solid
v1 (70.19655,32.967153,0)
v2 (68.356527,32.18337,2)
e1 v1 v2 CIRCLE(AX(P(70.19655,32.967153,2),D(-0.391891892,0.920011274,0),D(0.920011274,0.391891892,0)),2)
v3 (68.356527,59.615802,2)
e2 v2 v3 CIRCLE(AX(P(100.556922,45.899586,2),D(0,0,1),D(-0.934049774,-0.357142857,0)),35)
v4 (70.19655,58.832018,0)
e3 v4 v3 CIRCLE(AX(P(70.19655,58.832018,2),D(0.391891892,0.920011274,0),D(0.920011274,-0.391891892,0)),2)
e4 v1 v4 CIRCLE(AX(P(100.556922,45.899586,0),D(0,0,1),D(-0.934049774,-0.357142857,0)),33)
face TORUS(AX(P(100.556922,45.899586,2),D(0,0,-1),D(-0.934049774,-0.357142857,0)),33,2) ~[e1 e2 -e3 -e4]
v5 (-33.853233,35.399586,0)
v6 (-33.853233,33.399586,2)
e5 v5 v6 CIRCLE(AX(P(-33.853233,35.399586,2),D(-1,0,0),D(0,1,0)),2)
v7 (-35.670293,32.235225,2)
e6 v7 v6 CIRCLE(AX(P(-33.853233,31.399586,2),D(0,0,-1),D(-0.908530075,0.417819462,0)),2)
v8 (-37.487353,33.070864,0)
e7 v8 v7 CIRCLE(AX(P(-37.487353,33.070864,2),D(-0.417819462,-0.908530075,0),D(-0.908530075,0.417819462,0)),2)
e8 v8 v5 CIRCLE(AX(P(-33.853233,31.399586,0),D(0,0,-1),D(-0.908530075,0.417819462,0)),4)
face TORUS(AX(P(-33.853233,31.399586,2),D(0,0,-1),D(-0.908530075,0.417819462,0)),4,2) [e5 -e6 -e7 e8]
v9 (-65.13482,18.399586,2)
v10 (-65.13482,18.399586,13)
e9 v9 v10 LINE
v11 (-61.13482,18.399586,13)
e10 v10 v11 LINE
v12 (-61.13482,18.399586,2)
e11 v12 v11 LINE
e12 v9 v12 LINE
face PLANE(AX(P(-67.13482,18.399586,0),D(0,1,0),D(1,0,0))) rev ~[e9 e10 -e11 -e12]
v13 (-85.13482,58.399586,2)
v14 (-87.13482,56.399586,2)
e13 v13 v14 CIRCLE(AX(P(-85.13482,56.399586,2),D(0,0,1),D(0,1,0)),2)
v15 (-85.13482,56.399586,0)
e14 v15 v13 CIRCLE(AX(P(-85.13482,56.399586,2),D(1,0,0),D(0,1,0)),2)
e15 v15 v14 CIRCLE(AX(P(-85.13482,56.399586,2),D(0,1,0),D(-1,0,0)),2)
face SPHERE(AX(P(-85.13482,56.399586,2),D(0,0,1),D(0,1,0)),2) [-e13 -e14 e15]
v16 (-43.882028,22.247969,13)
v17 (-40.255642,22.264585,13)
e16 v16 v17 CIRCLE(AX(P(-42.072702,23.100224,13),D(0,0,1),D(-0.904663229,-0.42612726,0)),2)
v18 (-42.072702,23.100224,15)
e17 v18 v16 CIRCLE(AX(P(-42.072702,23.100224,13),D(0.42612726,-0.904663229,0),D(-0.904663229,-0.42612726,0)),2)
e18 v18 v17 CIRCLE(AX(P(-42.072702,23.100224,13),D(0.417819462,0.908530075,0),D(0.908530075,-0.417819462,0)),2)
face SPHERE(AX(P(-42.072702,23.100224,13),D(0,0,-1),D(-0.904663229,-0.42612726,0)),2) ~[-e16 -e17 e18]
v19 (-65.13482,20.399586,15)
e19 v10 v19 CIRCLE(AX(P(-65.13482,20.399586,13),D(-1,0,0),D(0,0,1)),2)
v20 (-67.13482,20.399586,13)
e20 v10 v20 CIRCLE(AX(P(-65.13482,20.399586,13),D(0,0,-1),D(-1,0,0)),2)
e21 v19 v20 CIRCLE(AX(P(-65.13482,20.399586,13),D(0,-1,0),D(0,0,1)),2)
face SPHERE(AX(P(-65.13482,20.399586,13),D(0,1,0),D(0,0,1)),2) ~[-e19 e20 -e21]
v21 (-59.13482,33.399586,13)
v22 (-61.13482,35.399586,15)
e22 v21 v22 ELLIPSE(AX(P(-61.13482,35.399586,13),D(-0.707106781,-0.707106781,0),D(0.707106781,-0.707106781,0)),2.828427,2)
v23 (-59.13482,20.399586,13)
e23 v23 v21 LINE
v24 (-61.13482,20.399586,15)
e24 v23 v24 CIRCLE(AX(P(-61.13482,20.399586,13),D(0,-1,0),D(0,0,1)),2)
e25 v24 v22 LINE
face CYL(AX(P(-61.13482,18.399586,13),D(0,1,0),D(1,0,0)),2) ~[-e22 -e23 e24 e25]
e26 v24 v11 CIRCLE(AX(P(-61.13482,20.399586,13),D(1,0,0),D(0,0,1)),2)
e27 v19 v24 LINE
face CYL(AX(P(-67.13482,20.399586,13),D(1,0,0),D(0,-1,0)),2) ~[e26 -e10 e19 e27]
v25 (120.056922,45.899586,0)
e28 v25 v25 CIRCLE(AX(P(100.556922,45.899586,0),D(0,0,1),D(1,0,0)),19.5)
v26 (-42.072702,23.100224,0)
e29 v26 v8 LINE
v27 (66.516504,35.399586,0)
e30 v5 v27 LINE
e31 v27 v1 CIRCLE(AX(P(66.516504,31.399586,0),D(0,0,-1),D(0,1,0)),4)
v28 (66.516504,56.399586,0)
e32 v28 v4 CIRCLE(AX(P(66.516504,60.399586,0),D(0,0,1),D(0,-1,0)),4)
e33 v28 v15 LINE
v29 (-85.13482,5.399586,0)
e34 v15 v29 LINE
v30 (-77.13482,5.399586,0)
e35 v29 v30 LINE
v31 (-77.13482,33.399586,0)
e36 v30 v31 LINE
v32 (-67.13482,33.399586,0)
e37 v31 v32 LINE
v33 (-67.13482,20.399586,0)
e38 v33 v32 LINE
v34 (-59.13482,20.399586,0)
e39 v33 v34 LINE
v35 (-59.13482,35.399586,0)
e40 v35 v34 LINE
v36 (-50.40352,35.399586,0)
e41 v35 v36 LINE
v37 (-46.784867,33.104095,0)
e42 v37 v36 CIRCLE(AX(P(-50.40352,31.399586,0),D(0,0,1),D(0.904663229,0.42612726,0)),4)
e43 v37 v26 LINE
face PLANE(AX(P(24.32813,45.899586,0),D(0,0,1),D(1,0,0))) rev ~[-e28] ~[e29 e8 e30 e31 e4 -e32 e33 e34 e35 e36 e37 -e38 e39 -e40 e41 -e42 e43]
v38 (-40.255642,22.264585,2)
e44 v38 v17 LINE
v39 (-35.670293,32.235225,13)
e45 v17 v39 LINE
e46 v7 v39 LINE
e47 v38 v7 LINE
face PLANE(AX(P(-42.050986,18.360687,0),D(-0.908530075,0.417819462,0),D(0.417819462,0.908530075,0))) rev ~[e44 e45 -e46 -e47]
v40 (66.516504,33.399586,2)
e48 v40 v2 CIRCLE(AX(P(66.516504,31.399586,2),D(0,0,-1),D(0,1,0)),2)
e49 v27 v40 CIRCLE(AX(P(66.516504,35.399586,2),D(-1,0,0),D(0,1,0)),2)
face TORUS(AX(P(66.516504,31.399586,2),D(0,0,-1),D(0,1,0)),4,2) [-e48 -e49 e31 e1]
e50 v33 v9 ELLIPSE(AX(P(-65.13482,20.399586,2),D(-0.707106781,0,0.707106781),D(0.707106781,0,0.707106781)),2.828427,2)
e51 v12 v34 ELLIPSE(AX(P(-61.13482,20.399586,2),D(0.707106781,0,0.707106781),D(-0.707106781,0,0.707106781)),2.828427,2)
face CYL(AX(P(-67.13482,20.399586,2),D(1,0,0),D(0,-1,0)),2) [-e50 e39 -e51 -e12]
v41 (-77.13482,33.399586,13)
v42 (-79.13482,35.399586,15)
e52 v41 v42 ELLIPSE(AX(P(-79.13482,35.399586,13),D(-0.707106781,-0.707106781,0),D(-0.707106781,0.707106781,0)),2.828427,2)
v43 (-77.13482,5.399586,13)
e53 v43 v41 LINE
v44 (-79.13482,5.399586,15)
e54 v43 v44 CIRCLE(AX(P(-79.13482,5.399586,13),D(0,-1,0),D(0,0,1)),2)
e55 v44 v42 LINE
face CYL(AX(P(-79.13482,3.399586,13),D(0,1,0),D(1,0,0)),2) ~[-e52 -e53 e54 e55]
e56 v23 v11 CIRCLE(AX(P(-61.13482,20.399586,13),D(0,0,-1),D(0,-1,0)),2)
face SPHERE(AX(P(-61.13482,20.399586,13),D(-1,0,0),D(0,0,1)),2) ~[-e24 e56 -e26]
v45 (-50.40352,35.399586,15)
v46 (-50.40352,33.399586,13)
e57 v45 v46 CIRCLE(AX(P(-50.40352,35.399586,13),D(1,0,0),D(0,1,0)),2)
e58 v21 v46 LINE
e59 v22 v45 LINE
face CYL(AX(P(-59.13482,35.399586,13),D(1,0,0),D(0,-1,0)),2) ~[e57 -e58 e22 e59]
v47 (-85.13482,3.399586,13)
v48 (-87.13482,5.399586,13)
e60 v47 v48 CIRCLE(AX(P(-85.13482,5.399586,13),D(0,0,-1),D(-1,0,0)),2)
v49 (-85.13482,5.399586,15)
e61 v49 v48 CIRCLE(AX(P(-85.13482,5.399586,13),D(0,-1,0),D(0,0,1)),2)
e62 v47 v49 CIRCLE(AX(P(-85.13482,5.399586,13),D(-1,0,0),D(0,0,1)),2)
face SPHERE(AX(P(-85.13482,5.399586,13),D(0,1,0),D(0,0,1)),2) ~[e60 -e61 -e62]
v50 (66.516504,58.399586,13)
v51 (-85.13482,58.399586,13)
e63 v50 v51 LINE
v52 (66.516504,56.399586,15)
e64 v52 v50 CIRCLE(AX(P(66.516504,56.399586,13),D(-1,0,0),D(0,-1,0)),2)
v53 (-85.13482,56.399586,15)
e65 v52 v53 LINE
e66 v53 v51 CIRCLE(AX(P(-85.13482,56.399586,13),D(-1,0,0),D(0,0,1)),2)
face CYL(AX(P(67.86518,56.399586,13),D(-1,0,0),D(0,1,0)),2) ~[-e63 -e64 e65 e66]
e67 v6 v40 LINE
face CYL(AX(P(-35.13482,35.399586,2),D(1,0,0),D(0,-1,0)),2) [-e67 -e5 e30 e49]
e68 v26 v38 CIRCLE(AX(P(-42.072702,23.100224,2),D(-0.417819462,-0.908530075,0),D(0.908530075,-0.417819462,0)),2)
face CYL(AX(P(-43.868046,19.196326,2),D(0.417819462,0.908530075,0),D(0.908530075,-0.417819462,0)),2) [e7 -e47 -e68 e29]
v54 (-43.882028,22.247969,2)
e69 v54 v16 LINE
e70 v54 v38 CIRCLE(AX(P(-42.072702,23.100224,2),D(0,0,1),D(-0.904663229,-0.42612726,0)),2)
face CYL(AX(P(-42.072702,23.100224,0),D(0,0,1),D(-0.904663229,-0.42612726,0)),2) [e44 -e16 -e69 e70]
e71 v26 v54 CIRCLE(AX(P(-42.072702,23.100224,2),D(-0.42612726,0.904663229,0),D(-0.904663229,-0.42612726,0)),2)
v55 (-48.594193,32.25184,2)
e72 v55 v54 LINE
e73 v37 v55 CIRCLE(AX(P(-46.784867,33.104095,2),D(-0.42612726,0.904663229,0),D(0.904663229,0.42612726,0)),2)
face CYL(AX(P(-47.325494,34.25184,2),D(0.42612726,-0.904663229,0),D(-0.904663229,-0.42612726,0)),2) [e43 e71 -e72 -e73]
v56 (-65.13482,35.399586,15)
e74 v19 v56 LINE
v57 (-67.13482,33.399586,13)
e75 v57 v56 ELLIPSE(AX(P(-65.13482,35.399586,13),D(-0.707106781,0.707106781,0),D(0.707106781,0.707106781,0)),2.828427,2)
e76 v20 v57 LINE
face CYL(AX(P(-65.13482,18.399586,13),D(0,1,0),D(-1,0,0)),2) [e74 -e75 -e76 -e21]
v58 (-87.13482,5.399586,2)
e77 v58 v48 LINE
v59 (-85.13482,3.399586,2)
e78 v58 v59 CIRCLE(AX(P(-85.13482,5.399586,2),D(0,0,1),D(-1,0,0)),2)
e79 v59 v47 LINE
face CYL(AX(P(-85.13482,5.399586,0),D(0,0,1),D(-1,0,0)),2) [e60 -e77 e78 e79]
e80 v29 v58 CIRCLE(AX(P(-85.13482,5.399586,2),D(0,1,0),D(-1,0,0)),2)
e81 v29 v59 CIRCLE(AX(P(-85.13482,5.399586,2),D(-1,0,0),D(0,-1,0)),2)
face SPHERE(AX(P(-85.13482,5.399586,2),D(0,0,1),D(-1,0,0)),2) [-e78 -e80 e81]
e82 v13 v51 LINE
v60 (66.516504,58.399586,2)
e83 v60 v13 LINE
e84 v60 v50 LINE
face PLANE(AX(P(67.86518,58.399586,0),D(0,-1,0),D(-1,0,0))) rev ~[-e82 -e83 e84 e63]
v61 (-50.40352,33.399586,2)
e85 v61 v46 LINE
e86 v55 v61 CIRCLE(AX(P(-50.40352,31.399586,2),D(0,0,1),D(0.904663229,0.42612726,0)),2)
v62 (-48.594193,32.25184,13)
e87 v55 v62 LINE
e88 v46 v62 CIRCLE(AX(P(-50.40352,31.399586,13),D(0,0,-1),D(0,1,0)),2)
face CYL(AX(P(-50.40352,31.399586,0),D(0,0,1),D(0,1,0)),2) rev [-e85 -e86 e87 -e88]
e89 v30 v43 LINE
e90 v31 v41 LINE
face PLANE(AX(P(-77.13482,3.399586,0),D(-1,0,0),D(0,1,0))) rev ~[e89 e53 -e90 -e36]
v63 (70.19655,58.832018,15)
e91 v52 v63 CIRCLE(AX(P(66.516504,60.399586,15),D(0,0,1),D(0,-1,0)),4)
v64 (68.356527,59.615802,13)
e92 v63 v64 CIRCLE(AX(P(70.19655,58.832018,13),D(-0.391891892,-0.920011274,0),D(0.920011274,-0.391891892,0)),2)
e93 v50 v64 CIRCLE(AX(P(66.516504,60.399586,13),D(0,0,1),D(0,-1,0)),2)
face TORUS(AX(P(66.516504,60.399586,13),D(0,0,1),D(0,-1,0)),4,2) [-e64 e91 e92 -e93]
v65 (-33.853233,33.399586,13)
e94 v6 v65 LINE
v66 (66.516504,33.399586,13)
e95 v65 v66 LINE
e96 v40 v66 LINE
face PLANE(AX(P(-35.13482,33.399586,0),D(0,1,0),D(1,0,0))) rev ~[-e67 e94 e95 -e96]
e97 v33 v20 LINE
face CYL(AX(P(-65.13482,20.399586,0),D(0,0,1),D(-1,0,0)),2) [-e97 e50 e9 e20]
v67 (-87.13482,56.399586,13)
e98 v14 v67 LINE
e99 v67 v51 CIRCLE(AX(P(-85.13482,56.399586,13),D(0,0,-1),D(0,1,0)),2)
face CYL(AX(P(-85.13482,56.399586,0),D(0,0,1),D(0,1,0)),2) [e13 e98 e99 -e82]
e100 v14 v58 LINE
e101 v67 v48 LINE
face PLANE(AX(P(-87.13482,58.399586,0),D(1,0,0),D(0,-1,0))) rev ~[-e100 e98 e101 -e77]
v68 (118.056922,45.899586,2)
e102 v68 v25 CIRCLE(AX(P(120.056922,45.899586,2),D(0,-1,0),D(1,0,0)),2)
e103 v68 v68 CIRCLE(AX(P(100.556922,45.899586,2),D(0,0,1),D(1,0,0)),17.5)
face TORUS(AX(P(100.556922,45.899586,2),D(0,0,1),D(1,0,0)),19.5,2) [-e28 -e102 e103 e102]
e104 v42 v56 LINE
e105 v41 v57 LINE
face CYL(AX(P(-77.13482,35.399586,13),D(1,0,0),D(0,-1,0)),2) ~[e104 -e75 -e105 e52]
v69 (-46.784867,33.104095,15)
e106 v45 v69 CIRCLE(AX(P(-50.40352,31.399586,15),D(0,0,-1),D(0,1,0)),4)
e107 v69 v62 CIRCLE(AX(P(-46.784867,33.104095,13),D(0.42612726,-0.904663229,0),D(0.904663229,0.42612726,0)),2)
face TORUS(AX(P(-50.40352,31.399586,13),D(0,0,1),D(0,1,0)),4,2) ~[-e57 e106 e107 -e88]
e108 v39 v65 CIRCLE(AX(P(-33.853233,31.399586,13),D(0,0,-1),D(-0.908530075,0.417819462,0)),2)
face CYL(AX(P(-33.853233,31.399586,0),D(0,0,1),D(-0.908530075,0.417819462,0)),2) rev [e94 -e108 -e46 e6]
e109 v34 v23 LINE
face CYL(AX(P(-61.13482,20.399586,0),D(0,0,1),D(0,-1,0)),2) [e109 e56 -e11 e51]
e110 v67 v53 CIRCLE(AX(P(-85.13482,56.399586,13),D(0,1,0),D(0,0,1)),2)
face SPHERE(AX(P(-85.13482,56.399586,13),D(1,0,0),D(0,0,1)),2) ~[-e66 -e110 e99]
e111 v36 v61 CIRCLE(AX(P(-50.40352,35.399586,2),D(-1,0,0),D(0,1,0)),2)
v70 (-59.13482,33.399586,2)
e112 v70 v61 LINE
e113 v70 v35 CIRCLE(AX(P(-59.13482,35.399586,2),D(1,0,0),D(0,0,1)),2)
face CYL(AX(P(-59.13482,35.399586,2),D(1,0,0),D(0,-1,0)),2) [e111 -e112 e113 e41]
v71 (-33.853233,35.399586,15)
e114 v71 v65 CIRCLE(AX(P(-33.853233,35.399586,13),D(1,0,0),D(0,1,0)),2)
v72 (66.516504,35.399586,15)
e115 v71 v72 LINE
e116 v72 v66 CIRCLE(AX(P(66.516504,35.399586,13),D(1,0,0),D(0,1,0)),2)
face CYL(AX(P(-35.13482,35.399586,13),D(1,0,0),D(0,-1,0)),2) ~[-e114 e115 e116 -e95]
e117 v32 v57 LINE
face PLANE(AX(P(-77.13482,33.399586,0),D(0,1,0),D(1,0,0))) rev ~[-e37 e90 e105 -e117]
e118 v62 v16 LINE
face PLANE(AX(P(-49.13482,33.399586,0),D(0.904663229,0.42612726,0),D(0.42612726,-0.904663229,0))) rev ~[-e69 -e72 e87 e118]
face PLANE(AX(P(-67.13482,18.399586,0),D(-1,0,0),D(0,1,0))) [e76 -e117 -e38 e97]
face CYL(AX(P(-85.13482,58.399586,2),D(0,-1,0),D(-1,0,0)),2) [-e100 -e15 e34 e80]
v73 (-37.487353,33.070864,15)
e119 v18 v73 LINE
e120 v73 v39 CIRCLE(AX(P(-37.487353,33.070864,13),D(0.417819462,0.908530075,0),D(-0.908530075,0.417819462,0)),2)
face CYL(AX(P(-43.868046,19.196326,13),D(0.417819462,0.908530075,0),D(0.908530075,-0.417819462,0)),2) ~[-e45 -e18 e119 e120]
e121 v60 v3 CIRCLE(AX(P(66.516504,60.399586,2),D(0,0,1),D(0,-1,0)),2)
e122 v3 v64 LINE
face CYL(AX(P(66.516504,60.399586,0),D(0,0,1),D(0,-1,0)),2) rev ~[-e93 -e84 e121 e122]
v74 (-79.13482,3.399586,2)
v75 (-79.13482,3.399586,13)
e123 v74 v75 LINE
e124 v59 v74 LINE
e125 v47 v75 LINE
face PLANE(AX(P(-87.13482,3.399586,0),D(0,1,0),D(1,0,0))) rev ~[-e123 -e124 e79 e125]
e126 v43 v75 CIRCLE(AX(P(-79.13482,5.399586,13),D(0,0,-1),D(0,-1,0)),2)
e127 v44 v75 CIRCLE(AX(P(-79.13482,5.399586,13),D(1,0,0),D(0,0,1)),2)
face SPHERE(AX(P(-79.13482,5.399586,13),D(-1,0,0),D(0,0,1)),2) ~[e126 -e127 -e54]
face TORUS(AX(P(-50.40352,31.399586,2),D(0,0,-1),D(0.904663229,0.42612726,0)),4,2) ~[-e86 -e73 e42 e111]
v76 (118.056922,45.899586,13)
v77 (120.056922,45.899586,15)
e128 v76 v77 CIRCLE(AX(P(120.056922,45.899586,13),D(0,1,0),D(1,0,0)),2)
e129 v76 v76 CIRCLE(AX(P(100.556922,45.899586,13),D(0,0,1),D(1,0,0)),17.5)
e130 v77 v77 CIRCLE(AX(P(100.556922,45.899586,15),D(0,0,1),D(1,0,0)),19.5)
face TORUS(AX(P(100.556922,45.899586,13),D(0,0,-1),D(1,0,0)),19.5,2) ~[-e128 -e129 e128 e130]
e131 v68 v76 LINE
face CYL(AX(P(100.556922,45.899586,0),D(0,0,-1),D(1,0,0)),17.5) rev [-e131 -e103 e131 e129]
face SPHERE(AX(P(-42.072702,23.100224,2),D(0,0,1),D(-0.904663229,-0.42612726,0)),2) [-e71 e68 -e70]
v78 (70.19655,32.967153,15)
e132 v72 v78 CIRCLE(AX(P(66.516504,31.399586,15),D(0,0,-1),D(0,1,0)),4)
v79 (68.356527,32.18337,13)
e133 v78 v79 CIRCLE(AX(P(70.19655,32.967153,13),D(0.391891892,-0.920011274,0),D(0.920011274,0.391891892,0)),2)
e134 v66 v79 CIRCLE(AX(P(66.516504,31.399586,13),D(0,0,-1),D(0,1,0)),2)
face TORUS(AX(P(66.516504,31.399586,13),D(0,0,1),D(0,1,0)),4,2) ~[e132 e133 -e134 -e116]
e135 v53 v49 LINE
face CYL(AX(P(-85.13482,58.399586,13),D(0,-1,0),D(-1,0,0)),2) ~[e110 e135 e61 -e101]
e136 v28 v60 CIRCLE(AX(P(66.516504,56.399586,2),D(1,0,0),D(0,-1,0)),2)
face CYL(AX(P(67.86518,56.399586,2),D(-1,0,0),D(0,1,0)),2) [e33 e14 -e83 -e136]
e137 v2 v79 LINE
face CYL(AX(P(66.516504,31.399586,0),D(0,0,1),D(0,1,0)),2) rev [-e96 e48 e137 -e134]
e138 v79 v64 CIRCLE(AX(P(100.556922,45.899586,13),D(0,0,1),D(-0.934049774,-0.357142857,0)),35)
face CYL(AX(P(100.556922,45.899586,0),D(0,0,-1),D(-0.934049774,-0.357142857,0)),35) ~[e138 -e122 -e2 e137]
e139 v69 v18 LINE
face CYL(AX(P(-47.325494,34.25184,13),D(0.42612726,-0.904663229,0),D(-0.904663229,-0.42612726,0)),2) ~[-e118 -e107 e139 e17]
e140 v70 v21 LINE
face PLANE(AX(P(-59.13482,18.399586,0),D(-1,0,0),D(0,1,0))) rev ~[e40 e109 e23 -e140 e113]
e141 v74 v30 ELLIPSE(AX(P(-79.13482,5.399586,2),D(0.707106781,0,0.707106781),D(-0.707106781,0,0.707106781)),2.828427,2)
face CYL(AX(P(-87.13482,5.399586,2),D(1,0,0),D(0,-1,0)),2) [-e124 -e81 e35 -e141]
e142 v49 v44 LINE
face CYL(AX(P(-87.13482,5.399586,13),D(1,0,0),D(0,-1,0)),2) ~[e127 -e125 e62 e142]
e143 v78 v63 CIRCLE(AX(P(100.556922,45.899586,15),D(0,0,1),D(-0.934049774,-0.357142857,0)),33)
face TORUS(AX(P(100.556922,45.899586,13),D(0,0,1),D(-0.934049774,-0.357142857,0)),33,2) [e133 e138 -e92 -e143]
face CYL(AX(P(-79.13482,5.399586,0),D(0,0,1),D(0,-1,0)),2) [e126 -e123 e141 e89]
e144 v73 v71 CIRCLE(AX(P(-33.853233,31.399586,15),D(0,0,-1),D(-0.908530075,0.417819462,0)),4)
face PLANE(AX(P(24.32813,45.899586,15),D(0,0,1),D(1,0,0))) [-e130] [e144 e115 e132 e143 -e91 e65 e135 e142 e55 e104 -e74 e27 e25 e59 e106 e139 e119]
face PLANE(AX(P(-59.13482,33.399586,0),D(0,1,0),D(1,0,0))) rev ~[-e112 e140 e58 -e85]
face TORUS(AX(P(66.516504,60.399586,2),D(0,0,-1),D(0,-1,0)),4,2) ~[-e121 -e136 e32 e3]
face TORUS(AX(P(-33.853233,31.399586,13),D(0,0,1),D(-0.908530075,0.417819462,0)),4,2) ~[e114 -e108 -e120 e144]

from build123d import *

# Parameters (mm, degrees)
F0_R     = 17.5
F0_W     = 8
F0_H     = 15
F0_W_2   = 10
F0_H_2   = 30
F1_DEPTH = 15
F2_R     = 2


with BuildPart() as f1:
    # F0 (on Top) → F1 (new body)
    with BuildSketch(Plane.XY):
        with BuildLine():
            Line((67.8651795072, 58.3995857492), (-87.1348204928, 58.3995857492))
            Line((-87.1348204928, 58.3995857492), (-87.1348204928, 33.3995857492))
            Line((-87.1348204928, 33.3995857492), (-77.1348204928, 33.3995857492))
            Line((-77.1348204928, 33.3995857492), (-67.1348204928, 33.3995857492))
            Line((-67.1348204928, 33.3995857492), (-59.1348204928, 33.3995857492))
            Line((-59.1348204928, 33.3995857492), (-49.1348204928, 33.3995857492))
            Line((-49.1348204928, 33.3995857492), (-35.1348204928, 33.3995857492))
            Line((-35.1348204928, 33.3995857492), (67.8651795072, 33.3995857492))
            ThreePointArc((67.8651795072, 33.3995857492), (135.5569215837, 45.8995857492), (67.8651795072, 58.3995857492))
        make_face()
        with Locations((100.5569215837, 45.8995857492)):
            Circle(F0_R, mode=Mode.SUBTRACT)
        with Locations((-63.1348204928, 25.8995857492)):
            Rectangle(F0_W, F0_H)
        Polygon((-42.0509860516, 18.3606874198), (-35.1348204928, 33.3995857492), (-49.1348204928, 33.3995857492), align=None)
        with Locations((-82.1348204928, 18.3995857492)):
            Rectangle(F0_W_2, F0_H_2)
    extrude(amount=F1_DEPTH)

    # F2
    f2_edges = [f1.edges().sort_by_distance(p)[0] for p in [
        (-54.13482, 33.399586, 15),
        (-9.63482, 58.399586, 15),
        (-87.13482, 30.899586, 15),
        (-82.13482, 3.399586, 15),
        (-77.13482, 18.399586, 15),
        (-72.13482, 33.399586, 15),
        (-67.13482, 25.899586, 15),
        (-63.13482, 18.399586, 15),
        (-59.13482, 25.899586, 15),
        (-45.592903, 25.880137, 15),
        (-38.592903, 25.880137, 15),
        (16.36518, 33.399586, 15),
        (135.556922, 45.899586, 15),
        (83.056922, 45.899586, 15),
        (135.556922, 45.899586, 0),
        (67.86518, 33.399586, 7.5),
        (67.86518, 58.399586, 7.5),
        (-87.13482, 58.399586, 7.5),
        (-9.63482, 58.399586, 0),
        (-87.13482, 3.399586, 7.5),
        (-87.13482, 30.899586, 0),
        (-77.13482, 3.399586, 7.5),
        (-59.13482, 18.399586, 7.5),
        (-49.13482, 33.399586, 7.5),
        (-42.050986, 18.360687, 7.5),
        (-45.592903, 25.880137, 0),
        (-35.13482, 33.399586, 7.5),
        (-82.13482, 3.399586, 0),
        (-67.13482, 18.399586, 7.5),
        (83.056922, 45.899586, 0),
        (-63.13482, 18.399586, 0),
        (-38.592903, 25.880137, 0),
        (16.36518, 33.399586, 0),
        (-54.13482, 33.399586, 0),
    ]]
    fillet(f2_edges, radius=F2_R)


solid = f1.part
